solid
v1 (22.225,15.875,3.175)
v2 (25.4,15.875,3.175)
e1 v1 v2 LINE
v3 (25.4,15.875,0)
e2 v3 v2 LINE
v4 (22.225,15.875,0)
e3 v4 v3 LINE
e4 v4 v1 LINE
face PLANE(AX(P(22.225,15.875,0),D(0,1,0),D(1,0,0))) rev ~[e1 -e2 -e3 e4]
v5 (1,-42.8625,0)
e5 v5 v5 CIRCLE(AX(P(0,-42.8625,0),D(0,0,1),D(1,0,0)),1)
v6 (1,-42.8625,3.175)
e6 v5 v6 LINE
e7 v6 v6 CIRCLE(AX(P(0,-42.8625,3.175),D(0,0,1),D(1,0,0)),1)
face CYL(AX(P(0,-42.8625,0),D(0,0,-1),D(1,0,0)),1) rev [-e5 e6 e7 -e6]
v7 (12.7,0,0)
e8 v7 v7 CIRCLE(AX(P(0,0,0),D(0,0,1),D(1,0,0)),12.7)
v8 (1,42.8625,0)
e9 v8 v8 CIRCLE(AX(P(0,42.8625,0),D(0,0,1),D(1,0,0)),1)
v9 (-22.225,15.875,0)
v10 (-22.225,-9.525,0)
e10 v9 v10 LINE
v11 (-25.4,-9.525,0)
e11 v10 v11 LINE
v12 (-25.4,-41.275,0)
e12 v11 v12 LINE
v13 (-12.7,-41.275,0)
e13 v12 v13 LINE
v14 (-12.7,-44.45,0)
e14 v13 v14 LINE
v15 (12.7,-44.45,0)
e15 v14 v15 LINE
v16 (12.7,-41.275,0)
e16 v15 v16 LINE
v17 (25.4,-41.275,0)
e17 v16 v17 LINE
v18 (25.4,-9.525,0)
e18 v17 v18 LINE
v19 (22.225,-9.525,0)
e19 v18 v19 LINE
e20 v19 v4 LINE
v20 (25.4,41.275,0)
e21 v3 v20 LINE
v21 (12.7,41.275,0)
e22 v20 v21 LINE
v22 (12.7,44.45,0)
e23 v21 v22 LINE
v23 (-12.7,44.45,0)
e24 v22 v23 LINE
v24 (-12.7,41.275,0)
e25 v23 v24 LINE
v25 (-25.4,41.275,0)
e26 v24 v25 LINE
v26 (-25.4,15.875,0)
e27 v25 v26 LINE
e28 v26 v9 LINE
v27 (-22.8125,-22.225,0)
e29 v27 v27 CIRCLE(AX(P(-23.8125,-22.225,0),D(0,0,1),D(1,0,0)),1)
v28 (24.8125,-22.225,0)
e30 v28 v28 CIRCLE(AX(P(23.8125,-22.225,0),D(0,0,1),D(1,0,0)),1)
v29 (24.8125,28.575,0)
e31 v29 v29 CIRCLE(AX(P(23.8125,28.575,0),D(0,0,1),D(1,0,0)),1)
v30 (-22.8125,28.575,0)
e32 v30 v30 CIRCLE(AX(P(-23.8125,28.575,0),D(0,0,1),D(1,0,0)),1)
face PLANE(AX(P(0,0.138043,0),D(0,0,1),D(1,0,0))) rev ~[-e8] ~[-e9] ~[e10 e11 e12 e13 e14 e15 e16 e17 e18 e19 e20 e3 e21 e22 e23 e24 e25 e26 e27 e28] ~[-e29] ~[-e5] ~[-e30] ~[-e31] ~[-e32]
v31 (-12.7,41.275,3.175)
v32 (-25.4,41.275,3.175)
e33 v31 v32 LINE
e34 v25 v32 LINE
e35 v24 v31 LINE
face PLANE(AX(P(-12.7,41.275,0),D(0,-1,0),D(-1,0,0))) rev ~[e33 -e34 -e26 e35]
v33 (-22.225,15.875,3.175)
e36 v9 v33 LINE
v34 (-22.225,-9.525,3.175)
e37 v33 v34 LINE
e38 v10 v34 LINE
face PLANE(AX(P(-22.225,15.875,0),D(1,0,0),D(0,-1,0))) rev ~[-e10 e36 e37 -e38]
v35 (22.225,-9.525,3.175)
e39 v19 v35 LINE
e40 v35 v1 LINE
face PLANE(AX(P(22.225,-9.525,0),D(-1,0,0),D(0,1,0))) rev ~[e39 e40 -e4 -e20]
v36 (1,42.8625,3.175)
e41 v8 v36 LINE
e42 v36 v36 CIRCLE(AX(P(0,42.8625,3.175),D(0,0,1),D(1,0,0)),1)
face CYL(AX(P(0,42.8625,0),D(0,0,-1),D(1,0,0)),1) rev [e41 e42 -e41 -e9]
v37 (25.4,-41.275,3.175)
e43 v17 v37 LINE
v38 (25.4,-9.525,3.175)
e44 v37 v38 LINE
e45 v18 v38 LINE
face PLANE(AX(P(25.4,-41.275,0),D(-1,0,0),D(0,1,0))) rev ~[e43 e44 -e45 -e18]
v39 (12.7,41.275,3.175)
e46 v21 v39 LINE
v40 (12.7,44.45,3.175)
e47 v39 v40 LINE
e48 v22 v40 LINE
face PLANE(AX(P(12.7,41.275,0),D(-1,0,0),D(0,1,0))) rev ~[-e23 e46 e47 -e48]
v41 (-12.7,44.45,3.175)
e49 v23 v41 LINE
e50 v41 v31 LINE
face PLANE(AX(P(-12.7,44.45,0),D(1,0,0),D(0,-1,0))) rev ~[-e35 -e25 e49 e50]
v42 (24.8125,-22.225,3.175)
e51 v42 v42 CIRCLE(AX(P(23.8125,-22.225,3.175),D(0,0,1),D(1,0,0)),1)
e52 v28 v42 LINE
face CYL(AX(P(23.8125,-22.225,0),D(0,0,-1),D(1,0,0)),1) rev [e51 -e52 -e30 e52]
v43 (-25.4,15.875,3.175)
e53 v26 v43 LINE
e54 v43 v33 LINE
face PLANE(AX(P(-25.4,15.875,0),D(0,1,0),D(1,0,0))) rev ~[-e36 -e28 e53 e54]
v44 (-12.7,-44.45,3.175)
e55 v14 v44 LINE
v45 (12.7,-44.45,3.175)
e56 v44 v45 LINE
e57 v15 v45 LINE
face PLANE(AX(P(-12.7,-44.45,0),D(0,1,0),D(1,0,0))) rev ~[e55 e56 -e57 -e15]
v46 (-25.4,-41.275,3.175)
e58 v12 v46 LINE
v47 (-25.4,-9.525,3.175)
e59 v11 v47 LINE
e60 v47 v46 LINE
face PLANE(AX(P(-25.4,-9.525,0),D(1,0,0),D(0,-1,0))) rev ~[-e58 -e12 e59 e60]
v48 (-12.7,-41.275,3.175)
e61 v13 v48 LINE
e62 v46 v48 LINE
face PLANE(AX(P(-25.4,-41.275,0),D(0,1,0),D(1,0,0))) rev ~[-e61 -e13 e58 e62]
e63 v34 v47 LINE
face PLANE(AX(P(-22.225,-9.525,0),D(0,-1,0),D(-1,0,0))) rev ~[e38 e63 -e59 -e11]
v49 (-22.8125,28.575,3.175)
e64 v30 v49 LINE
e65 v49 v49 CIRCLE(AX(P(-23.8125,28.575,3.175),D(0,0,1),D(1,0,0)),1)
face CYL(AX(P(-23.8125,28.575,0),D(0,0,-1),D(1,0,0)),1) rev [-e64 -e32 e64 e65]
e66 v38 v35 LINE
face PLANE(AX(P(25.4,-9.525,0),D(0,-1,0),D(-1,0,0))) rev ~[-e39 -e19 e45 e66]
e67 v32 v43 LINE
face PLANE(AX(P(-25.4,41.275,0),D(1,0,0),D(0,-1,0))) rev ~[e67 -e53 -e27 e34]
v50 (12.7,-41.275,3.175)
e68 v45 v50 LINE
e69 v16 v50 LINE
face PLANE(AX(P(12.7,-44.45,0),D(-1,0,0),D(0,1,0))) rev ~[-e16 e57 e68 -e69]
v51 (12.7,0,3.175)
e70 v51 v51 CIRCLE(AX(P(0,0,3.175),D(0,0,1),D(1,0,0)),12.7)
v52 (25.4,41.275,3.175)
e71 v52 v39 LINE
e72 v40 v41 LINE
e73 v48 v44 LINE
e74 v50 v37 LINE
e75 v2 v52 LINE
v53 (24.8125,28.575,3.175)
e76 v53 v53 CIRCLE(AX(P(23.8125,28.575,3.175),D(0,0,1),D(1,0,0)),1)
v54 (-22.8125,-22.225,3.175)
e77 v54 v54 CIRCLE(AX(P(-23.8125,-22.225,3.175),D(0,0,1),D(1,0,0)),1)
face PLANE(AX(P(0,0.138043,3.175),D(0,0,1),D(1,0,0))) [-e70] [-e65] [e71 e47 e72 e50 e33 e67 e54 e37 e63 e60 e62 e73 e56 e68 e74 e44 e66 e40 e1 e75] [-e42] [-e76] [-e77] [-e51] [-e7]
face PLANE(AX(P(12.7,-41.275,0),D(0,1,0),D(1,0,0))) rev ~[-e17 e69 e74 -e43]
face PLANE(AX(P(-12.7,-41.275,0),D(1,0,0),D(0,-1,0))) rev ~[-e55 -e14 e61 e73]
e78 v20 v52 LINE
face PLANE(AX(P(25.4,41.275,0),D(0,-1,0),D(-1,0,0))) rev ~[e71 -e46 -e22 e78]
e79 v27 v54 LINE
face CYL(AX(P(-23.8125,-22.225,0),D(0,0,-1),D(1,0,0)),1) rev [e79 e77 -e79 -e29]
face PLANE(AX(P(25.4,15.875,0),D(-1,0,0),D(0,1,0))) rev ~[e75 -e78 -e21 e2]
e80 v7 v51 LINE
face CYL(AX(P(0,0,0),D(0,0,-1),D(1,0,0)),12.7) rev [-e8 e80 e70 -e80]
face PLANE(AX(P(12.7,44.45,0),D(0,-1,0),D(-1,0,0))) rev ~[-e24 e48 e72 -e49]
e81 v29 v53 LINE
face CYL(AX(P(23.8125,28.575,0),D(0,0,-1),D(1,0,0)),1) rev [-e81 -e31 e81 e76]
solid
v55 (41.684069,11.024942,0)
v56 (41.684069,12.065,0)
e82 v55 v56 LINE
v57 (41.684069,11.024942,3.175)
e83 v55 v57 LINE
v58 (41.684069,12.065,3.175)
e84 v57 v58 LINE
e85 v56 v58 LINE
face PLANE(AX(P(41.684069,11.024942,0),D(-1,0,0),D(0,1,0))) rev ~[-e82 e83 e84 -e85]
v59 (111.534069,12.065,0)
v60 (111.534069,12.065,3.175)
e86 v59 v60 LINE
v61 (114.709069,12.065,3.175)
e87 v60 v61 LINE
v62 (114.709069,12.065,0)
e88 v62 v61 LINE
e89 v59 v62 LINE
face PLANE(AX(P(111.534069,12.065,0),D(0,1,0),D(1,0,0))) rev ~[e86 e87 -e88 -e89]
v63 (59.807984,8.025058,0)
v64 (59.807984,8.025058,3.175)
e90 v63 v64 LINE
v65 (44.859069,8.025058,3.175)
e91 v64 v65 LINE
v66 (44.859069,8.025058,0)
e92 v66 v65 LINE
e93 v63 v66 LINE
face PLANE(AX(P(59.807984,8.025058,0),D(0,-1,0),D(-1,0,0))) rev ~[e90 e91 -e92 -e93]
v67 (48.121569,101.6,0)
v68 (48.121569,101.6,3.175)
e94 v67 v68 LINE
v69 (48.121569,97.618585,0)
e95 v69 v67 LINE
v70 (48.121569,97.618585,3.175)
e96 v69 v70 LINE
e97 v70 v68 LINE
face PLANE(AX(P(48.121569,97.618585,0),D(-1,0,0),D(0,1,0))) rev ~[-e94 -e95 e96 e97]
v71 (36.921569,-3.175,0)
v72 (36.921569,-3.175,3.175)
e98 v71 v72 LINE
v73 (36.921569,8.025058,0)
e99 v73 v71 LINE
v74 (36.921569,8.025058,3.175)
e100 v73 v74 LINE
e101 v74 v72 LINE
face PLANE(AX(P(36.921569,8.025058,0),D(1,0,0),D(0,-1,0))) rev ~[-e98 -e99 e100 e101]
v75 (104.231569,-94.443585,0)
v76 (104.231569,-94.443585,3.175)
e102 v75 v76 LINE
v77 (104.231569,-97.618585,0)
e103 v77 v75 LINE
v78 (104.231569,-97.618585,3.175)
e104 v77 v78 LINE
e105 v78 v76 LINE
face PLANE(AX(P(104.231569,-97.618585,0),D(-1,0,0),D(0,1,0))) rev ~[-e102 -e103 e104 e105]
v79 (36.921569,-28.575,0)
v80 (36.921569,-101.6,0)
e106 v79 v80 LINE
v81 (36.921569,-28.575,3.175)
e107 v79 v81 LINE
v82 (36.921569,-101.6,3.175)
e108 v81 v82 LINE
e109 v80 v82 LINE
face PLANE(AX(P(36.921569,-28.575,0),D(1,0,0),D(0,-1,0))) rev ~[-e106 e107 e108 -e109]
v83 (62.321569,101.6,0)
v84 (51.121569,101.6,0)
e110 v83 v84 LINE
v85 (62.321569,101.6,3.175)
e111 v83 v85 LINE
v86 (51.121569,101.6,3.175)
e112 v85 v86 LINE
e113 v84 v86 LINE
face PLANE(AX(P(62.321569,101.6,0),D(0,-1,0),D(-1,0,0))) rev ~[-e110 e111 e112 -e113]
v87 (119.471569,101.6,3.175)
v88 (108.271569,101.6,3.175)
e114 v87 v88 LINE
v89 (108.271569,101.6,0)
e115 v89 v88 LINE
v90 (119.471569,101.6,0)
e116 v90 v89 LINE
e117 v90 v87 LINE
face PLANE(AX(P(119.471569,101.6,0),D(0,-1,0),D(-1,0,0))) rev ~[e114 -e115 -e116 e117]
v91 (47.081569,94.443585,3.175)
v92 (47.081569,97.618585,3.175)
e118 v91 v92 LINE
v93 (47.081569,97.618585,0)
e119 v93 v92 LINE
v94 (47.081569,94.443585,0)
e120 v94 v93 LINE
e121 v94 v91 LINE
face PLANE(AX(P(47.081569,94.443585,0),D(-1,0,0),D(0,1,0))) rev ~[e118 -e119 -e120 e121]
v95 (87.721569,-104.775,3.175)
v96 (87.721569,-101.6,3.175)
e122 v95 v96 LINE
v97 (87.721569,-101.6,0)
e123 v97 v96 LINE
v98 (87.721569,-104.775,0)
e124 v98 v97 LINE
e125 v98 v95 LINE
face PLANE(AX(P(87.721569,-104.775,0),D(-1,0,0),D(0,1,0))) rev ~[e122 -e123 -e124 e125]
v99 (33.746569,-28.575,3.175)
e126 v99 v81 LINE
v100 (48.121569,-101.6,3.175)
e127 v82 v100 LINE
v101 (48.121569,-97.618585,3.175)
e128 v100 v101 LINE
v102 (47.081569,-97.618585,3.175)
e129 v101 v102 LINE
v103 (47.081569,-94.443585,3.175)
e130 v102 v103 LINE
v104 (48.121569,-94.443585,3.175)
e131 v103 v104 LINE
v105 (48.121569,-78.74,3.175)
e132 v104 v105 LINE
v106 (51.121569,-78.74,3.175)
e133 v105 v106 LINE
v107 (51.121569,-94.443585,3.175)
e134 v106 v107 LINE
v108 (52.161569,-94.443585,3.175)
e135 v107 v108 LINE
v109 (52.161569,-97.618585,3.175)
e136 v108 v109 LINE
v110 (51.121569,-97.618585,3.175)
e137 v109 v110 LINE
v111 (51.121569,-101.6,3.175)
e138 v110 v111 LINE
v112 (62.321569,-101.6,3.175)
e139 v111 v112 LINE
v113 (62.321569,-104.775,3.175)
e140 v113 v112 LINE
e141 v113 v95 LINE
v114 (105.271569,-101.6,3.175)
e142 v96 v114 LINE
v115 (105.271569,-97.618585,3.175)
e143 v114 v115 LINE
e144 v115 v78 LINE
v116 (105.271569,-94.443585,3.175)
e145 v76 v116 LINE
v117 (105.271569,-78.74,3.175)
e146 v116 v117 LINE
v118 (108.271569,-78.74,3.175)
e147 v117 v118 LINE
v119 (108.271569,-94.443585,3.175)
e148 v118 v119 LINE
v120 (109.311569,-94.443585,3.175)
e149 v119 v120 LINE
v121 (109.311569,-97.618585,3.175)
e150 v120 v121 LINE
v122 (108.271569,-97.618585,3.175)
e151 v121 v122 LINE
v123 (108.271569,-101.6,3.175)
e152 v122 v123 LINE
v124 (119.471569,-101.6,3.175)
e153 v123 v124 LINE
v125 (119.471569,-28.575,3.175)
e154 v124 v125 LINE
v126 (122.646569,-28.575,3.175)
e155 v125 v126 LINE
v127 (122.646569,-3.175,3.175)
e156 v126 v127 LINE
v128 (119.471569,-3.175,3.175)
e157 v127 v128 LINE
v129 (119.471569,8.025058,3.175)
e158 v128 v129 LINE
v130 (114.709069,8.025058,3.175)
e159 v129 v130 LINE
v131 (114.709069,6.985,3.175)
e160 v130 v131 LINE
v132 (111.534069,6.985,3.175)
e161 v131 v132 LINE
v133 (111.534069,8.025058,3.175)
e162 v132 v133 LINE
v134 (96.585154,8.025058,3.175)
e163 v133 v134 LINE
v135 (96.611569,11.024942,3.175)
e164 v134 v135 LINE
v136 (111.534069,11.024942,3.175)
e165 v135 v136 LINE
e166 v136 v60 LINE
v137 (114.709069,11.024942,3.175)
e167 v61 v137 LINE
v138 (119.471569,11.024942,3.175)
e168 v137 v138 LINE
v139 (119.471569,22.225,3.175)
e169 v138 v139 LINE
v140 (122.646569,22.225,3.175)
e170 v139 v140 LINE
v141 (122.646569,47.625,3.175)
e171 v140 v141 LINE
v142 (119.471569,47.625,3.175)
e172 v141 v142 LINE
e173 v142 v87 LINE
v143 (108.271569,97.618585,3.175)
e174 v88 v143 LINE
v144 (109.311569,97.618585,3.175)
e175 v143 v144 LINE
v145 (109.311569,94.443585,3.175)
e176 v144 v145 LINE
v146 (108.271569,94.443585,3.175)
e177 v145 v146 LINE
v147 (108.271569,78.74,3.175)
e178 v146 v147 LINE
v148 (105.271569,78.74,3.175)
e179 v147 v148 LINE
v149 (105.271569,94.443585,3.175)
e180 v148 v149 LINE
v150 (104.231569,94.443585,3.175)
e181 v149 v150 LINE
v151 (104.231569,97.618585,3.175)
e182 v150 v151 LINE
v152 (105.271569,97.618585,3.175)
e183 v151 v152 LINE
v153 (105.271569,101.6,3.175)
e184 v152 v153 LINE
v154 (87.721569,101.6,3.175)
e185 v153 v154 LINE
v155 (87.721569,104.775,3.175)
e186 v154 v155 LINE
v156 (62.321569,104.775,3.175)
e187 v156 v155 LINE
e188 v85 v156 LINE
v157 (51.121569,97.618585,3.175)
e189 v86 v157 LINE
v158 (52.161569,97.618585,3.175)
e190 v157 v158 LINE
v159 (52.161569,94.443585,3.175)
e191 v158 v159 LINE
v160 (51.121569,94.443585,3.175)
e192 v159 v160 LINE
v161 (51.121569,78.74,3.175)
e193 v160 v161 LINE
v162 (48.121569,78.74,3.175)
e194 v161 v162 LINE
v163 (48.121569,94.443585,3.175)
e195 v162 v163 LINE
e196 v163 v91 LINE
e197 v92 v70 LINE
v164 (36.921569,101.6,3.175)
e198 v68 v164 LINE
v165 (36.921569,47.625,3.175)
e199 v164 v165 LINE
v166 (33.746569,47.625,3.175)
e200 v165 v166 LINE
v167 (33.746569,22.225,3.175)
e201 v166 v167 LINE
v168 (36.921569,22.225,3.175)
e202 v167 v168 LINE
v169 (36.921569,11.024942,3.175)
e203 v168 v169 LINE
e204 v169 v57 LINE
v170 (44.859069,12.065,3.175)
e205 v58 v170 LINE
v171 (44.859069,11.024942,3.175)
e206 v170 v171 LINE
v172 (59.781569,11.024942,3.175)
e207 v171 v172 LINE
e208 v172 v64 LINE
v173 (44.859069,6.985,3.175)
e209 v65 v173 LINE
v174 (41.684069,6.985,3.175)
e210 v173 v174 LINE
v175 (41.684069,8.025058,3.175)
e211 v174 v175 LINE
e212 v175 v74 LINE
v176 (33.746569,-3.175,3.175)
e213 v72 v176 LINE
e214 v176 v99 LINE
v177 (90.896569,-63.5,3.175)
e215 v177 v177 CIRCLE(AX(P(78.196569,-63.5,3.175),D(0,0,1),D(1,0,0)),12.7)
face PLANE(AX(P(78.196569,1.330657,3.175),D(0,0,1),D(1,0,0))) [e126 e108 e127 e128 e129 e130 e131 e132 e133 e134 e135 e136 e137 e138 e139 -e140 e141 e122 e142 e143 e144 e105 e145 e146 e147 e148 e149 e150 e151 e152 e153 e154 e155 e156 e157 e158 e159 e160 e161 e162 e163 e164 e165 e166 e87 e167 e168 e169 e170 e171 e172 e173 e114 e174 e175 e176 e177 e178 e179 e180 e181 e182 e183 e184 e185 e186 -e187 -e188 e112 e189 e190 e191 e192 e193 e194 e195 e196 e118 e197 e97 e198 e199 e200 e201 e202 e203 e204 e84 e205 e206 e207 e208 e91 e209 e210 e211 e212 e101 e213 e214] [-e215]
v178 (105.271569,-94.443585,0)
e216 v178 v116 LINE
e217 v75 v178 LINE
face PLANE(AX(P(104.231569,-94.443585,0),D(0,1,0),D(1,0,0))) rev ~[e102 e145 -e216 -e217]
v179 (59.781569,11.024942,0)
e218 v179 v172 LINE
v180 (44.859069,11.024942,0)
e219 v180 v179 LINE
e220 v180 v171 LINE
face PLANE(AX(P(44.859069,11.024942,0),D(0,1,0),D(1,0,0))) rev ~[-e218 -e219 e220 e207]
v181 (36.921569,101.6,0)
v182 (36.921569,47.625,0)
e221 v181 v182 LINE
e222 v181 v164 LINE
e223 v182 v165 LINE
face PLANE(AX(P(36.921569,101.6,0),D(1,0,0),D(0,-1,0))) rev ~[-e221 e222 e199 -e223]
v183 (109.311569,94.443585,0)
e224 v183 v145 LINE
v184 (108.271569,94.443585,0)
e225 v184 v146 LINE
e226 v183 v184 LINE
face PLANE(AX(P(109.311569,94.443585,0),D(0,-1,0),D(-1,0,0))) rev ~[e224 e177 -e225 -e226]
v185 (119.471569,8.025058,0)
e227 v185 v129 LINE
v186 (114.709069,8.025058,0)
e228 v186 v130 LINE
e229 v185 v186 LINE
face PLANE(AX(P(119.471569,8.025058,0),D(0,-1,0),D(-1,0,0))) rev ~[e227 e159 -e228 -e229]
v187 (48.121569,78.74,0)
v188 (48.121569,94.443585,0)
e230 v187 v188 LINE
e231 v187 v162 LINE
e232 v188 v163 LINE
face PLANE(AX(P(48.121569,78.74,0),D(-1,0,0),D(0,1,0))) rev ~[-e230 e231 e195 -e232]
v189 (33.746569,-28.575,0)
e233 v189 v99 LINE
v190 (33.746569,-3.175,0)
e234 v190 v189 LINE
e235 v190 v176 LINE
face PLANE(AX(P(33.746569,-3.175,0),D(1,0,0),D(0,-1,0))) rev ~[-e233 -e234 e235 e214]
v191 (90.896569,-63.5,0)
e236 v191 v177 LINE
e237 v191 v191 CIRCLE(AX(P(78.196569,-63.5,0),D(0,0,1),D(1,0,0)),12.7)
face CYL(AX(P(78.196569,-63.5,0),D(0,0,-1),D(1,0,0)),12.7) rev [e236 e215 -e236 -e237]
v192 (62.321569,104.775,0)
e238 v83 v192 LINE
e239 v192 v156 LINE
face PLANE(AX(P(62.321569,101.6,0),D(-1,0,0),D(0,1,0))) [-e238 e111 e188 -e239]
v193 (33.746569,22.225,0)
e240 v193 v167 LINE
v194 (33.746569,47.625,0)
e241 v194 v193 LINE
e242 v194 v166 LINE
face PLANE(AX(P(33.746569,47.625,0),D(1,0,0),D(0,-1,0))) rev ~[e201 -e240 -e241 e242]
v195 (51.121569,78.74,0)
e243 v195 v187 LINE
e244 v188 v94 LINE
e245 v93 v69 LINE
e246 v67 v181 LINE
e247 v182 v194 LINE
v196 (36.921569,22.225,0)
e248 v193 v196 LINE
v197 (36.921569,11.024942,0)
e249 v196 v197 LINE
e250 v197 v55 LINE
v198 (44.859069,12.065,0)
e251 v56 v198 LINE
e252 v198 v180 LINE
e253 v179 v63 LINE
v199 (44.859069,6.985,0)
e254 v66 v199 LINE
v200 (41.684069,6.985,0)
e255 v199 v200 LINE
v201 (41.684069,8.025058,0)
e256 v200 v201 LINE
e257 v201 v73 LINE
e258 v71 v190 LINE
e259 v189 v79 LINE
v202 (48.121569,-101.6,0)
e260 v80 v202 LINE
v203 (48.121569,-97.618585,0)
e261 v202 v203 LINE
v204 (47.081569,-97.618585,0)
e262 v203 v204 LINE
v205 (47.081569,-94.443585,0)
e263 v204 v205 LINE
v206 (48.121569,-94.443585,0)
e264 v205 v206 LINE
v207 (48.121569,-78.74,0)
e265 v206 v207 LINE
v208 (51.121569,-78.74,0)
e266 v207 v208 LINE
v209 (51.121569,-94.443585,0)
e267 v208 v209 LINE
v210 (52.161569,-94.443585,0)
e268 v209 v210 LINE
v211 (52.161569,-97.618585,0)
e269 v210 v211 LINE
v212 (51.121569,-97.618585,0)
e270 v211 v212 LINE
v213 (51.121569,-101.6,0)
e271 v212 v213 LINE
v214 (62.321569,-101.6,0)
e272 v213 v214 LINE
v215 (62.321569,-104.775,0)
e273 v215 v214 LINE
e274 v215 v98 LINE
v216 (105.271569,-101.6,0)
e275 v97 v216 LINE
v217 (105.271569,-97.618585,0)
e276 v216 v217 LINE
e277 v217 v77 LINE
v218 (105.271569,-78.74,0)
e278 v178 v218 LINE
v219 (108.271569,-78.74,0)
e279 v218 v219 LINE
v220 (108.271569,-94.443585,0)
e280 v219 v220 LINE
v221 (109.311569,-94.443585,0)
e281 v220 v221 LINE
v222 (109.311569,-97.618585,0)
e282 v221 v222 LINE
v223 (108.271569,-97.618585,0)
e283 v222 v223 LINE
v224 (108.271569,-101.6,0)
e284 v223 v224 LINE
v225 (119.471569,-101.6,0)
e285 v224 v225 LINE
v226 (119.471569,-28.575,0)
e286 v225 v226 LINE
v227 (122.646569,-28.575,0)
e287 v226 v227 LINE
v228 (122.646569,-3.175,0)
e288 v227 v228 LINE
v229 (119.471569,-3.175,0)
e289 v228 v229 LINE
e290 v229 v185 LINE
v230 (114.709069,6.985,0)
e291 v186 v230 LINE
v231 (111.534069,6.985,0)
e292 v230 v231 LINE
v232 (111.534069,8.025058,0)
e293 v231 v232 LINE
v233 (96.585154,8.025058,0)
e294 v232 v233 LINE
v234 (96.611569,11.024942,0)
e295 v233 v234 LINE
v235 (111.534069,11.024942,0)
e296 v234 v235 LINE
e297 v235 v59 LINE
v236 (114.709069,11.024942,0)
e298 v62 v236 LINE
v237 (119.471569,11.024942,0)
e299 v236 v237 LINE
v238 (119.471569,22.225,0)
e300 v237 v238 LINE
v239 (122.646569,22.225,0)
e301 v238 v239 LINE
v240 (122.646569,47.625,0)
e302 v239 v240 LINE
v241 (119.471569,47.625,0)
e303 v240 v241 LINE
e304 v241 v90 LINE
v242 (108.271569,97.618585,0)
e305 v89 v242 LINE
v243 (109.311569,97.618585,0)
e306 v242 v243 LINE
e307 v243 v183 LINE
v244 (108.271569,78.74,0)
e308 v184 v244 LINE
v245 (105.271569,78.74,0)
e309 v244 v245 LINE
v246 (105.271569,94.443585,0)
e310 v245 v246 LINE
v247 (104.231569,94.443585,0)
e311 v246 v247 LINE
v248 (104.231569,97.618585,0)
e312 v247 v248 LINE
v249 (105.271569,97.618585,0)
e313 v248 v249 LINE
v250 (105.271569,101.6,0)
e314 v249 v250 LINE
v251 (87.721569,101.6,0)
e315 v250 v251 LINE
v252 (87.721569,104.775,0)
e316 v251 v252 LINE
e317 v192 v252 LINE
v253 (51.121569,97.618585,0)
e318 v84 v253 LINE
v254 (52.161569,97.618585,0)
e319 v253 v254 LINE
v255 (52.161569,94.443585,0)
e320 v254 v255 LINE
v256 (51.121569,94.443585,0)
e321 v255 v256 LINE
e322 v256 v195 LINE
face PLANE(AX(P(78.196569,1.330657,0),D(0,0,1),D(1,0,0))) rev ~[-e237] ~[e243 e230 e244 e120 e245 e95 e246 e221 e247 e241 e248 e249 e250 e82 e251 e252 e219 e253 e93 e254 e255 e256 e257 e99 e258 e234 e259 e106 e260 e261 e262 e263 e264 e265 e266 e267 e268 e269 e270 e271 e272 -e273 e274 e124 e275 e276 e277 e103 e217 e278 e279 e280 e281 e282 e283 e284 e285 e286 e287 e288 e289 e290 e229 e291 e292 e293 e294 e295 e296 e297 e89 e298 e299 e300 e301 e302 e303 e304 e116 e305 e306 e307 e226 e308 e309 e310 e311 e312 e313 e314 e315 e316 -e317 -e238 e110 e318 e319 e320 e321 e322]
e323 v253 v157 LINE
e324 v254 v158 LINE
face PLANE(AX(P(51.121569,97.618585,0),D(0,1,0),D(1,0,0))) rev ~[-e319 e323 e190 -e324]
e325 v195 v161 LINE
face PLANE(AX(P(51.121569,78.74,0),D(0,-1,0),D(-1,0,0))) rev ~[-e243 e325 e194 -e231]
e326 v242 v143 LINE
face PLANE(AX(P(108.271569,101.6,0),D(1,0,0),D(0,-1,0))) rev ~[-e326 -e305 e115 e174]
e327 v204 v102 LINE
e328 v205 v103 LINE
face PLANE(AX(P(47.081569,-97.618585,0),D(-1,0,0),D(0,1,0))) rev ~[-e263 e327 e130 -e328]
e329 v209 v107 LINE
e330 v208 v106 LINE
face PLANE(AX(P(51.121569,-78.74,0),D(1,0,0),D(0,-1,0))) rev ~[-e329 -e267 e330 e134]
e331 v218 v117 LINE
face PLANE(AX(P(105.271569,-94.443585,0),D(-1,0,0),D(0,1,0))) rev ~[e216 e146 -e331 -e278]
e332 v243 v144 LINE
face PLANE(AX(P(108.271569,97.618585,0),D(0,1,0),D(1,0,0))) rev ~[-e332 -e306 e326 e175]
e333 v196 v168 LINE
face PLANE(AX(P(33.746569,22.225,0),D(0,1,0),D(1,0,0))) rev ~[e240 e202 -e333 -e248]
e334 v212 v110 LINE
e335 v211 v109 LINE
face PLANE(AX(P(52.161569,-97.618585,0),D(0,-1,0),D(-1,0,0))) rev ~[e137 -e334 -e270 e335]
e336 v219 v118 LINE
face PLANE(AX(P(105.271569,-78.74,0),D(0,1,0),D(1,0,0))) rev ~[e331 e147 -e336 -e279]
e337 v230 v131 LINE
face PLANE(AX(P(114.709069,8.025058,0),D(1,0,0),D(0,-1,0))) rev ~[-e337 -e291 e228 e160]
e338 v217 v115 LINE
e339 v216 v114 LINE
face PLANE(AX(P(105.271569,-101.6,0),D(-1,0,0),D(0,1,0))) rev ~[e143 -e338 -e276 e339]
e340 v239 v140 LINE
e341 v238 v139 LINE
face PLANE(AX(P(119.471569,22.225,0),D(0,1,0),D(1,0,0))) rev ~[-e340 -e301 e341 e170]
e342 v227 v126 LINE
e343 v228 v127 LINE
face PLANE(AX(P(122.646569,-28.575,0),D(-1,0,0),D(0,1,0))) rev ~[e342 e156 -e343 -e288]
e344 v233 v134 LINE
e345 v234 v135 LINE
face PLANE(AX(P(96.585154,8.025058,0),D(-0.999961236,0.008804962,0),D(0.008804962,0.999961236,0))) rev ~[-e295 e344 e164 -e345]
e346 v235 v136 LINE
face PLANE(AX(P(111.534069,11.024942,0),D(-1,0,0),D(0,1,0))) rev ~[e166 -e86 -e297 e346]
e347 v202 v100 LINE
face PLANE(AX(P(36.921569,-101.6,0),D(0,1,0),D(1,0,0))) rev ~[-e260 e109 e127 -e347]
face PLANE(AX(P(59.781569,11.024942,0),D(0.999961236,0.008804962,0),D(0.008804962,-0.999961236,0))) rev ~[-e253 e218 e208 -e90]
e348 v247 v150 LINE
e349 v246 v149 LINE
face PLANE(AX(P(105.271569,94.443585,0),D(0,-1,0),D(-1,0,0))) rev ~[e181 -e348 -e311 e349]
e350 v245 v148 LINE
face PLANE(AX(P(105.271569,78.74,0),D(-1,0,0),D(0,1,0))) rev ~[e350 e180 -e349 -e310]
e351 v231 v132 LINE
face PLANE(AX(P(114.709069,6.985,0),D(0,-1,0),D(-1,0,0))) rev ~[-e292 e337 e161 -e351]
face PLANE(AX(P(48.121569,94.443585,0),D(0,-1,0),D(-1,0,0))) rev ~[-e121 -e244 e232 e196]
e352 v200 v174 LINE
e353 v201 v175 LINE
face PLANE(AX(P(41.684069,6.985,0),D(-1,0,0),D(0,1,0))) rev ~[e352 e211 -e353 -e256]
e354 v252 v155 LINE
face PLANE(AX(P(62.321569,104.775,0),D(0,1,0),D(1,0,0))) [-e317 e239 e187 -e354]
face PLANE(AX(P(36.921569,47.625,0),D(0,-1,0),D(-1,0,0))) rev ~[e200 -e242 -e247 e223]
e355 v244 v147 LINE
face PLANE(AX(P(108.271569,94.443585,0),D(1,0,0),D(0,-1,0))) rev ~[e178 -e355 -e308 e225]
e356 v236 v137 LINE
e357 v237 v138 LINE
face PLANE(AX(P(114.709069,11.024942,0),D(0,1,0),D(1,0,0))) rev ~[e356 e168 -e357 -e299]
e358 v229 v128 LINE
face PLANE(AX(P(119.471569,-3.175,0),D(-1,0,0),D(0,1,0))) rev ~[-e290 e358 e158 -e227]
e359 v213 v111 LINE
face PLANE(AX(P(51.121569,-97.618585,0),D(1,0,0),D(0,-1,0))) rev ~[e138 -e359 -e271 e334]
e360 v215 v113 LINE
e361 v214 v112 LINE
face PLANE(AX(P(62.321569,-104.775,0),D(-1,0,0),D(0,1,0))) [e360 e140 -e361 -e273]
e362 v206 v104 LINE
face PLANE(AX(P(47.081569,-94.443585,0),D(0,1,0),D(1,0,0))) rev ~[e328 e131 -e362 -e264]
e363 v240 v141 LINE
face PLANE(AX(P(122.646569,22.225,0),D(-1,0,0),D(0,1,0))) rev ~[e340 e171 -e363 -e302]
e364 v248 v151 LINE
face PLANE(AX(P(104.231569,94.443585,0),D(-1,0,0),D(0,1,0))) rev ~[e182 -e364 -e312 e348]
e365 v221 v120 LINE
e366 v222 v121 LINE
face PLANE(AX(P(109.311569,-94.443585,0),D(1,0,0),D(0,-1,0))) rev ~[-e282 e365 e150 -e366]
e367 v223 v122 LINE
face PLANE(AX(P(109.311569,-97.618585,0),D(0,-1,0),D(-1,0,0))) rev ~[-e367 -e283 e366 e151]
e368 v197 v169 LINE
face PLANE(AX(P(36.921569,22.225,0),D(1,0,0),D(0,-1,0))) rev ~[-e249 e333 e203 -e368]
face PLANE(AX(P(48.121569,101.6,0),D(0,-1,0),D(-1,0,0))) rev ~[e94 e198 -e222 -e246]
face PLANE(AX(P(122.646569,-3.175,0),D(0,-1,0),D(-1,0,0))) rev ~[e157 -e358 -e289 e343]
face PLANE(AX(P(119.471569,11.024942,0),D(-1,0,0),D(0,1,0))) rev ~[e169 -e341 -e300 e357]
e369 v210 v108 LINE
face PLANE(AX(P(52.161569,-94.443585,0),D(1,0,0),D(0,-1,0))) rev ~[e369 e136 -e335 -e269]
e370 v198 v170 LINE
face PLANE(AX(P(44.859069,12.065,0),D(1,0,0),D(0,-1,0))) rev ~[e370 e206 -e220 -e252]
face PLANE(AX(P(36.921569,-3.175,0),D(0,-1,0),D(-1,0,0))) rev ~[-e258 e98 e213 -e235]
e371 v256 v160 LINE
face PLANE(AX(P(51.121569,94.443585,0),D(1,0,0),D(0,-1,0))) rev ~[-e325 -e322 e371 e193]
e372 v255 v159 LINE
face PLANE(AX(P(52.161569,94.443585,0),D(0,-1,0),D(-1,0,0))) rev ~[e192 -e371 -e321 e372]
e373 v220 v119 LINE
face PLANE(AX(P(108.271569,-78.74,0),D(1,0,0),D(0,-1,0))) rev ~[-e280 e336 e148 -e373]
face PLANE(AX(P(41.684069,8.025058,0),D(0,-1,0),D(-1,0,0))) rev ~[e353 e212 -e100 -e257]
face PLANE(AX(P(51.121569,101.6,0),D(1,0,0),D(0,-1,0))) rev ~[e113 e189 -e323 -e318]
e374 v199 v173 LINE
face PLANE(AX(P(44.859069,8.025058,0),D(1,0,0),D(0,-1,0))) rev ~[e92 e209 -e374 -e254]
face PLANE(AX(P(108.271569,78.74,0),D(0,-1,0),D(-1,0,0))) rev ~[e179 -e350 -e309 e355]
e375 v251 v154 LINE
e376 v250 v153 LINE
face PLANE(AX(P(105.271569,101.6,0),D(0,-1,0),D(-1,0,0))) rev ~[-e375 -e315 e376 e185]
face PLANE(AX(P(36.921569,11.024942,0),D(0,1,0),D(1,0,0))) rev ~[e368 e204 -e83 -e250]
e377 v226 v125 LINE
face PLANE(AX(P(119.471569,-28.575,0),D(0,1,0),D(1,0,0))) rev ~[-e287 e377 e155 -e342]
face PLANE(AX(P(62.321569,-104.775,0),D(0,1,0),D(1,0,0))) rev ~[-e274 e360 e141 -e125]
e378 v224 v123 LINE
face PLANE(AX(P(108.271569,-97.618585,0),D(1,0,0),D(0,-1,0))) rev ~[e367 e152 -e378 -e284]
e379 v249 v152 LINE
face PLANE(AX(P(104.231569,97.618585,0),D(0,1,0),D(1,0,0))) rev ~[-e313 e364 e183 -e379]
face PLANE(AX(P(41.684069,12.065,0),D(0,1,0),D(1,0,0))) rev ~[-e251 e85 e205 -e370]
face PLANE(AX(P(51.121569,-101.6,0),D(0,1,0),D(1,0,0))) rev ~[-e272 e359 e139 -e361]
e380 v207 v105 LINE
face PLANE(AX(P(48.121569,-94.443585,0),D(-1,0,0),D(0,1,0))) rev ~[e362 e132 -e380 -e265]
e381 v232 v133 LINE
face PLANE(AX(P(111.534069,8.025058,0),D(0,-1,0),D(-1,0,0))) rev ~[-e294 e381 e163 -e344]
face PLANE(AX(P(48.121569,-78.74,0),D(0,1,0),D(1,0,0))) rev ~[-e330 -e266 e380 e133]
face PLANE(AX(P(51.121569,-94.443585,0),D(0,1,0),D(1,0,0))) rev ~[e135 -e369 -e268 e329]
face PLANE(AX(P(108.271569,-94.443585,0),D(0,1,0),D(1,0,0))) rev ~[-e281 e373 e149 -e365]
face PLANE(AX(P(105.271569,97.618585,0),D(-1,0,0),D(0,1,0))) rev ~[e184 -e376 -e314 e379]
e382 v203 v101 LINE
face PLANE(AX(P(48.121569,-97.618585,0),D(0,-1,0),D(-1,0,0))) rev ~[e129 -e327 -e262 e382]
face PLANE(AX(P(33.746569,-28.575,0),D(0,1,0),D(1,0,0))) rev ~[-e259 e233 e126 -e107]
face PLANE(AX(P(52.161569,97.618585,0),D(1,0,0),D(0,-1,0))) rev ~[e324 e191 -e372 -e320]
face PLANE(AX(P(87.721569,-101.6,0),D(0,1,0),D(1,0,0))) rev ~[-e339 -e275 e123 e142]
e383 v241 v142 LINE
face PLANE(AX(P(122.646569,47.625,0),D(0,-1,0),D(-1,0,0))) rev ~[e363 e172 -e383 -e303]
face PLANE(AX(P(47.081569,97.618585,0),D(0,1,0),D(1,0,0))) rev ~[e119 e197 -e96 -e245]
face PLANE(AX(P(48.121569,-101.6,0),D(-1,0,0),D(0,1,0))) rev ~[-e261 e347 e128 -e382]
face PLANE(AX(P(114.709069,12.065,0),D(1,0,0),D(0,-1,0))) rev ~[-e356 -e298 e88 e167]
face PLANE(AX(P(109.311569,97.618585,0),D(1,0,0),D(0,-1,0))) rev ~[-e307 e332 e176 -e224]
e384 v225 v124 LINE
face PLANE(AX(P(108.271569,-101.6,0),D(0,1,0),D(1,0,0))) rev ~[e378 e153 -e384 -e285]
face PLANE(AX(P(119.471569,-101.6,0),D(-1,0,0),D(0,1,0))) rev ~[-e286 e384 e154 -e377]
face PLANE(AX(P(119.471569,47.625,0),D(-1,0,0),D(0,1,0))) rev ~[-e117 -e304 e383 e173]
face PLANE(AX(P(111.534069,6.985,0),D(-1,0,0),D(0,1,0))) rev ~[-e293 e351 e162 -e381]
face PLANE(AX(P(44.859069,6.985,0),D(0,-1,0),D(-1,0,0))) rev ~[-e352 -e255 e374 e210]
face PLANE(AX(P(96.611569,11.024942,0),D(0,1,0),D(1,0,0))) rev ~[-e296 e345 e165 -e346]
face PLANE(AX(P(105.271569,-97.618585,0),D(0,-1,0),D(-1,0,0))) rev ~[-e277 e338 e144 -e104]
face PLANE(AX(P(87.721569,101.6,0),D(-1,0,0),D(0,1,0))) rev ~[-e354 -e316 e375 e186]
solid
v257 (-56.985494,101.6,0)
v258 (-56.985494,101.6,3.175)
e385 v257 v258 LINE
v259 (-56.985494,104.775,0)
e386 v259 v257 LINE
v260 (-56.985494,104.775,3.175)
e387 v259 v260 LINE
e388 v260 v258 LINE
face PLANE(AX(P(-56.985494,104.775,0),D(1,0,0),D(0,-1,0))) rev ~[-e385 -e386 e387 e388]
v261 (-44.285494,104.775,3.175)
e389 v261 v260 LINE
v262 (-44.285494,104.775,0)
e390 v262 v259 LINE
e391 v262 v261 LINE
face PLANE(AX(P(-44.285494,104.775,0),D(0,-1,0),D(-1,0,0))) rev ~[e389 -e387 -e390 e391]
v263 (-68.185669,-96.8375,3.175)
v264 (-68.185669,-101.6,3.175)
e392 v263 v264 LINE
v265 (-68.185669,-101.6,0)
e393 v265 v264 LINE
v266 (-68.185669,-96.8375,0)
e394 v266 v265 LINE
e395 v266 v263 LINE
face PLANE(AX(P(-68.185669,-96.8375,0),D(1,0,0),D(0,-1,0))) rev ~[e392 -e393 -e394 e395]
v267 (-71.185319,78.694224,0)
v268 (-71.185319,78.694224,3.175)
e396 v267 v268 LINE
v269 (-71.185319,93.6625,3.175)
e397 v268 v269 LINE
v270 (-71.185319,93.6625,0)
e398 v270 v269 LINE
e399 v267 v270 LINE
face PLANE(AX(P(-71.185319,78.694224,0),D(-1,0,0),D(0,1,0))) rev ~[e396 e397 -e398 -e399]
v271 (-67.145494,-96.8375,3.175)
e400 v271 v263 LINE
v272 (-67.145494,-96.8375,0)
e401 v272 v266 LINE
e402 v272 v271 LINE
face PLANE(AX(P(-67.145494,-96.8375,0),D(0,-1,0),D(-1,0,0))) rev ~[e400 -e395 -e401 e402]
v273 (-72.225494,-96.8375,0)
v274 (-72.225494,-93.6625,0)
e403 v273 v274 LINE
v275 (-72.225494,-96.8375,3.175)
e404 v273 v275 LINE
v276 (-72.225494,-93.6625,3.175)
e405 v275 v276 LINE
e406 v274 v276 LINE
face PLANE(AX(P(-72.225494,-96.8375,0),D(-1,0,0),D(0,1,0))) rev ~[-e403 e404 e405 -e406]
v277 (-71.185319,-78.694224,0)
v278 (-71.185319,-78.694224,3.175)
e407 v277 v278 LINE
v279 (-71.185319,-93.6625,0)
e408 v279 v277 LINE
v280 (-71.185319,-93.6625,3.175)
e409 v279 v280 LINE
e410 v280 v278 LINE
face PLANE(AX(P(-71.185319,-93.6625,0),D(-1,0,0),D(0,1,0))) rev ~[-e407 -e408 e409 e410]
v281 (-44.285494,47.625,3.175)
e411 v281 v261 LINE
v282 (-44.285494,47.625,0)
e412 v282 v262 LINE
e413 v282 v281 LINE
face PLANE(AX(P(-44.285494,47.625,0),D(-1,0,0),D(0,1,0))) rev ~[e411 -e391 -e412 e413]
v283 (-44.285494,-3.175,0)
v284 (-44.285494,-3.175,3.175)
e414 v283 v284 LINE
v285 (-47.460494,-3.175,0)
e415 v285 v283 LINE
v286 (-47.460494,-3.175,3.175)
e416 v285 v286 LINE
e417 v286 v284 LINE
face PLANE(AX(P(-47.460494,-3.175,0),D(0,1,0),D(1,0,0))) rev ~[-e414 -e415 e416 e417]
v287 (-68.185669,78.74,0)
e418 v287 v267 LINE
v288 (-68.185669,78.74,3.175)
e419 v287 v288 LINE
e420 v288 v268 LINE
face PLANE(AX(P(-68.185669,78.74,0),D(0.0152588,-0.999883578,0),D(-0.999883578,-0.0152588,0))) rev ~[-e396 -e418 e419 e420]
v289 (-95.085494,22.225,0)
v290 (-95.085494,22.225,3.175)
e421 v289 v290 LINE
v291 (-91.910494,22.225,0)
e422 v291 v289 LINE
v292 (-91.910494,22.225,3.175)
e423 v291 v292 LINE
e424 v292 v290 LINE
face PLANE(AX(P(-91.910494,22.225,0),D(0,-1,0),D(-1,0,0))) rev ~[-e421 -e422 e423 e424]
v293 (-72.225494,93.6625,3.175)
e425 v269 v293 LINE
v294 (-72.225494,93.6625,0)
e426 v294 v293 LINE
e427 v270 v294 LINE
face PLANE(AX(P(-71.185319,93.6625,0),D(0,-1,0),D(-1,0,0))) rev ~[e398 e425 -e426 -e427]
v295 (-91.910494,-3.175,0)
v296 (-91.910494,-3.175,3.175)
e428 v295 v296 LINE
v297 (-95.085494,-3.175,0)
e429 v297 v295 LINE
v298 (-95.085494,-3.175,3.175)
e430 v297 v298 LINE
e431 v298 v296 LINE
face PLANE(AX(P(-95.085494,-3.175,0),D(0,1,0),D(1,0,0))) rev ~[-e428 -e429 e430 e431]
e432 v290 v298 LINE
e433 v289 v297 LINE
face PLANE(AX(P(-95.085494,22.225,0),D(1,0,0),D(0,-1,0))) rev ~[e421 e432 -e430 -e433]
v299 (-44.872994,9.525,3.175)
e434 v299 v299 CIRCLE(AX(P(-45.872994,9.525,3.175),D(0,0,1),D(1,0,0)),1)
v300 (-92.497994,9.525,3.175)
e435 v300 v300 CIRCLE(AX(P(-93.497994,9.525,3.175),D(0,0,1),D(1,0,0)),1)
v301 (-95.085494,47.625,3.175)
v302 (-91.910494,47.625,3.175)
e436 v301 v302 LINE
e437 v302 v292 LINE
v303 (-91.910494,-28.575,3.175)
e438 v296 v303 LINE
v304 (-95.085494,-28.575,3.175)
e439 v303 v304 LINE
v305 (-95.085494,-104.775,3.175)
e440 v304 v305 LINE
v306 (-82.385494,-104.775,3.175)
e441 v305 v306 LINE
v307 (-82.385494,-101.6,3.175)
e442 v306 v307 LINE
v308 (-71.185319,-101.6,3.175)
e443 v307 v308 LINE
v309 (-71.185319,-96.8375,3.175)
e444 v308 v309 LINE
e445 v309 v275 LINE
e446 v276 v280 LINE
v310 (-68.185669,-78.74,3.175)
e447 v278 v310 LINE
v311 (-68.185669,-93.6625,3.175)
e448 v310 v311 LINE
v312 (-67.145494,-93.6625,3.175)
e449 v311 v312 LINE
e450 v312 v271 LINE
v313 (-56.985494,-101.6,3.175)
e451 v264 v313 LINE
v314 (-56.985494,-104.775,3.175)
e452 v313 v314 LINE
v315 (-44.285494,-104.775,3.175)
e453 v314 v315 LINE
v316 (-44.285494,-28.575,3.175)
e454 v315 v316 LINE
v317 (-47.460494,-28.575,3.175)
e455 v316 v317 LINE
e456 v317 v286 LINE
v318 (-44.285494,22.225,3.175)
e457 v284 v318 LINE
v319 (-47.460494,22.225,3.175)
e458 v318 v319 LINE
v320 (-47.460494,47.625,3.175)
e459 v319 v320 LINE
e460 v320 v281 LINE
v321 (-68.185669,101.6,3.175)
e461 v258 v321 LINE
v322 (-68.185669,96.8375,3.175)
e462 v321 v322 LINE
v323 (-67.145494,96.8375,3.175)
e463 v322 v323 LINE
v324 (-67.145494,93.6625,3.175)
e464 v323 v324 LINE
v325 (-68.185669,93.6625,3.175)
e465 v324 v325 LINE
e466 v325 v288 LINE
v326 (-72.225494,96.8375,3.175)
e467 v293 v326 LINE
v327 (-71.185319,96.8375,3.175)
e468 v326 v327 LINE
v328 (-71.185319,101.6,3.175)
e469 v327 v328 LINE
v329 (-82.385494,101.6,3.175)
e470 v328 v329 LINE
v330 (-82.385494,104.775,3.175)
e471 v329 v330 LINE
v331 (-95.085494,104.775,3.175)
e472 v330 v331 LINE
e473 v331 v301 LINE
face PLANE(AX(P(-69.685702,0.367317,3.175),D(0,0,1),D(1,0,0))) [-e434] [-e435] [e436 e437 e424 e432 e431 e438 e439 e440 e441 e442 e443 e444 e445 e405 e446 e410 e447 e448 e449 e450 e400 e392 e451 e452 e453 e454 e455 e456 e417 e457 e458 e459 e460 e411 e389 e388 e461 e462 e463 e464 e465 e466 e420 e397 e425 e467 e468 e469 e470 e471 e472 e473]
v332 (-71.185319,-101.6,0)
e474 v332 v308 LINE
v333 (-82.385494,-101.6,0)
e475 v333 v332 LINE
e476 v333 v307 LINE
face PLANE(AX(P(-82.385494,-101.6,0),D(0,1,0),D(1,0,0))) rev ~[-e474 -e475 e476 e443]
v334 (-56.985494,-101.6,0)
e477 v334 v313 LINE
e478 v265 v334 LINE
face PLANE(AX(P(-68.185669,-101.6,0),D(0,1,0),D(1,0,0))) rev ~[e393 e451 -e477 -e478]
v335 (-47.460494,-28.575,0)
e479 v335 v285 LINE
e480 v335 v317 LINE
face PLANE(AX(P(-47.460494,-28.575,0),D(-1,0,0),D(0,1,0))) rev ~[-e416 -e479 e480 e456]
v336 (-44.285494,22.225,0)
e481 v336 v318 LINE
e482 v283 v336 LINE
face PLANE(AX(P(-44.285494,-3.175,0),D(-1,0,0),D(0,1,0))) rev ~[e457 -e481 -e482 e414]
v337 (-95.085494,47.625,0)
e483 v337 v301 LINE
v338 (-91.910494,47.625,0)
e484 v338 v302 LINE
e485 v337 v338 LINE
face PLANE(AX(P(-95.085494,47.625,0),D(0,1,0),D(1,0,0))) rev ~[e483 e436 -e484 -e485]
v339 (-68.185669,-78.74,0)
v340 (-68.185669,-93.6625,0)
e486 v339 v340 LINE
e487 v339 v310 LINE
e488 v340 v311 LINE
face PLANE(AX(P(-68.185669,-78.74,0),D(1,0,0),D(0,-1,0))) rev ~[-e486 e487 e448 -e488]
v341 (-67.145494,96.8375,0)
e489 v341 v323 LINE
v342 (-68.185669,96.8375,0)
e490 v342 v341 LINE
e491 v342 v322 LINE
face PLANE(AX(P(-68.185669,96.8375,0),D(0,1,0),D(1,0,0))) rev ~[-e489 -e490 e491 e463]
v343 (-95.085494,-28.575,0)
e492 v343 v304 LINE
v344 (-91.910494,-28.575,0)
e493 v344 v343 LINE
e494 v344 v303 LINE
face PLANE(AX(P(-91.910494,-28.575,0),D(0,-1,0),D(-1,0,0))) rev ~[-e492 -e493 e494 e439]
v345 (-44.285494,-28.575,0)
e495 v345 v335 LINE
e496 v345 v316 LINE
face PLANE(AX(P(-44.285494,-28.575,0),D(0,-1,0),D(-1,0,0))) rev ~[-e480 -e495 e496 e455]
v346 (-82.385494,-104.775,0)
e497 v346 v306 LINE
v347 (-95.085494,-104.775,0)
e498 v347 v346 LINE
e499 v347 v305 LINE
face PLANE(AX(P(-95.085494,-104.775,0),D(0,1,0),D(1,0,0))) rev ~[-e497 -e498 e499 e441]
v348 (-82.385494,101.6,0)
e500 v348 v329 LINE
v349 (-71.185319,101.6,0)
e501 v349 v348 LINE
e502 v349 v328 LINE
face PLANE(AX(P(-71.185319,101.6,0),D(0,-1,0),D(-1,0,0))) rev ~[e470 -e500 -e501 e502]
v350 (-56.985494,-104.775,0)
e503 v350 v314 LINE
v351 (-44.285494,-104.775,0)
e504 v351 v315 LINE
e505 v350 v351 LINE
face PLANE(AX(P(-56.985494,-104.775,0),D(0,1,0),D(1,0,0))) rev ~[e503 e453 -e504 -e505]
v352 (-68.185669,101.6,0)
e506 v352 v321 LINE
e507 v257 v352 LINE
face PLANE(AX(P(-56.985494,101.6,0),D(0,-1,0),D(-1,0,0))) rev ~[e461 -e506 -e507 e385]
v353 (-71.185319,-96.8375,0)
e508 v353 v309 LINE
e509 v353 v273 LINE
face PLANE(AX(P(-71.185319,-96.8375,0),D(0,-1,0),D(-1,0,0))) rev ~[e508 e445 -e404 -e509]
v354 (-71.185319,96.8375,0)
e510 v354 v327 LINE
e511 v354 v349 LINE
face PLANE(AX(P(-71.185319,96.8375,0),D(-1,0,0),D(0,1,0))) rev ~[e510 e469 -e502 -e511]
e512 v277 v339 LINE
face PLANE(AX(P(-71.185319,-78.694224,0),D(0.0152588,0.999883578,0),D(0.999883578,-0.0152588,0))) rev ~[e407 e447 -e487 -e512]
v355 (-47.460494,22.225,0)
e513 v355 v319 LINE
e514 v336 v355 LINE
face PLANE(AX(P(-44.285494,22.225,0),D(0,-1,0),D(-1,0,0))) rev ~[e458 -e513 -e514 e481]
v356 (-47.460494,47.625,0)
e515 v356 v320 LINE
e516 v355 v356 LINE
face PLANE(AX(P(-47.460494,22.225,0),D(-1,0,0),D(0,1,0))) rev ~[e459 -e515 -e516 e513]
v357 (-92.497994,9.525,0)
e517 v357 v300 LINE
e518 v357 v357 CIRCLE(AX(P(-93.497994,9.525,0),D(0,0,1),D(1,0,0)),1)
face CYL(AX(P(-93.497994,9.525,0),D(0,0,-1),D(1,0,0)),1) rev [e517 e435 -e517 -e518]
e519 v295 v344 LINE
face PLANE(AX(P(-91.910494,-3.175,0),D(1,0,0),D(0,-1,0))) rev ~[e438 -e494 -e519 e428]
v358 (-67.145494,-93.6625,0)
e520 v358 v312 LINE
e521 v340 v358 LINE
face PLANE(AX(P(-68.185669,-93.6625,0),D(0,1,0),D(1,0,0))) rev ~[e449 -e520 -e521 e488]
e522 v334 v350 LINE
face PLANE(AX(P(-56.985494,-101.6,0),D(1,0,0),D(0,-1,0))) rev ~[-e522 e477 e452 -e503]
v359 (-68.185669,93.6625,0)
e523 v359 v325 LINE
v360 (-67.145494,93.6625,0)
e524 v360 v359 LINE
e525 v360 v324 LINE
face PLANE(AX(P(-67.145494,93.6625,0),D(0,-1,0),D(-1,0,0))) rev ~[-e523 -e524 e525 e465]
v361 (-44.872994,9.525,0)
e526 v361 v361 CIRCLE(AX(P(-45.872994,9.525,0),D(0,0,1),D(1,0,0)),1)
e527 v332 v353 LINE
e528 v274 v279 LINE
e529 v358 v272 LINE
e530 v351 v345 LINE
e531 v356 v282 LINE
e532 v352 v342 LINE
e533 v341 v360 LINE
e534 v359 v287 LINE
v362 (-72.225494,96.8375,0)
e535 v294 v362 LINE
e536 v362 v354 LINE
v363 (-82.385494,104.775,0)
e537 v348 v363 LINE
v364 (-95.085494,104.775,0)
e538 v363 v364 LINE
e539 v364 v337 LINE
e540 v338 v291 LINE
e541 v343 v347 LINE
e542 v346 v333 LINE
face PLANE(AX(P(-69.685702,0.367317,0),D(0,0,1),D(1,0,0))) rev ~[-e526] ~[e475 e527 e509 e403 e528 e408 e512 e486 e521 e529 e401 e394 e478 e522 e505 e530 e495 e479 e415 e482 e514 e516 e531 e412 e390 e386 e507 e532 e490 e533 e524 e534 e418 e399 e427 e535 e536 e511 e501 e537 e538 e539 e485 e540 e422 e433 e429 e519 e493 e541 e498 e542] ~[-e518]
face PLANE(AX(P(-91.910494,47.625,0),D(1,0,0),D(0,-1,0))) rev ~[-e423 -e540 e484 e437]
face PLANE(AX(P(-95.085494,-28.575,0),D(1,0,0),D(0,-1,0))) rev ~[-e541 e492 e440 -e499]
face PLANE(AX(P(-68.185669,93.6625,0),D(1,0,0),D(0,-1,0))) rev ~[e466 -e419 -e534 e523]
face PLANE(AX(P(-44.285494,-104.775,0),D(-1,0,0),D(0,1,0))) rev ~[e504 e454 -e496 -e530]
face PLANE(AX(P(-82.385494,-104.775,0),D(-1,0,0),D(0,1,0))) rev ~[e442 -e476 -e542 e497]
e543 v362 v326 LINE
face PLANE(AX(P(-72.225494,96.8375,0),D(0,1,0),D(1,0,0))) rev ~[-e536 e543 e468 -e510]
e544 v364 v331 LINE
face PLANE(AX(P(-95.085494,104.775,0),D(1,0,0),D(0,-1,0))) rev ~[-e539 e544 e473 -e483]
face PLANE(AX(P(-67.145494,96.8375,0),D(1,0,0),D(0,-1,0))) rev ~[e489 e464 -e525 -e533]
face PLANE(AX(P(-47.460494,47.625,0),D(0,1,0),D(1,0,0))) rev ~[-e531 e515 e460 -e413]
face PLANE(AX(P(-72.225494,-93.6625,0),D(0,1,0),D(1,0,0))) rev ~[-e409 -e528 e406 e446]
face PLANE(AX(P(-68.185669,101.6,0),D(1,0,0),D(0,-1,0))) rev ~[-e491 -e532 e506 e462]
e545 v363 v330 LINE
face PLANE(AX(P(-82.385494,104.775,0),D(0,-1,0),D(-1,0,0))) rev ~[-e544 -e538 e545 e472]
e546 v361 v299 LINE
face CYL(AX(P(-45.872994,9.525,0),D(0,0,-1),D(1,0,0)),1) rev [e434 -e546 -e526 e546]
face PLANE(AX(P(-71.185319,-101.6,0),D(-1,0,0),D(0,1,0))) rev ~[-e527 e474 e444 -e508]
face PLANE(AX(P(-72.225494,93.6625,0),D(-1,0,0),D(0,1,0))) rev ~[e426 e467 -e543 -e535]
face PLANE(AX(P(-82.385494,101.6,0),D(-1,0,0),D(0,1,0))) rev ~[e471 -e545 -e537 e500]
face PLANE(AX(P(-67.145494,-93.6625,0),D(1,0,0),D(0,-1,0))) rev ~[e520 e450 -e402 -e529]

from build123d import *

# Parameters (mm, degrees)
F0_R     = 1
F0_R_2   = 12.7
F2_DEPTH = 3.175
F1_R     = 1
F3_DEPTH = 3.175
F4_R     = 12.7
F4_W     = 25.4
F4_H     = 3.175
F5_DEPTH = 3.175


# Not quite as in the source:
# - a length typed as a fraction of an inch, garbled in the dataset ("3 / 203.2 mm" for 3/8 in), is restored


with BuildPart() as f2:
    # F0 (on Top) → F2 (new body)
    with BuildSketch(Plane.XY):
        Polygon((-12.7, 41.275), (-22.225, 41.275), (-25.4, 41.275), (-25.4, 15.875), (-22.225, 15.875), (-22.225, -9.525), (-25.4, -9.525), (-25.4, -34.925), (-25.4, -41.275), (-22.225, -41.275), (-12.7, -41.275), (-12.7, -44.45), (12.7, -44.45), (12.7, -41.275), (22.225, -41.275), (25.4, -41.275), (25.4, -34.925), (25.4, -9.525), (22.225, -9.525), (22.225, 15.875), (25.4, 15.875), (25.4, 41.275), (22.225, 41.275), (12.7, 41.275), (12.7, 44.45), (-12.7, 44.45), align=None)
        with Locations((0, -42.8625)):
            Circle(F0_R, mode=Mode.SUBTRACT)
        with Locations((-23.8125, -22.225)):
            Circle(F0_R, mode=Mode.SUBTRACT)
        with Locations((23.8125, -22.225)):
            Circle(F0_R, mode=Mode.SUBTRACT)
        Circle(F0_R_2, mode=Mode.SUBTRACT)
        with Locations((-23.8125, 28.575)):
            Circle(F0_R, mode=Mode.SUBTRACT)
        with Locations((0, 42.8625)):
            Circle(F0_R, mode=Mode.SUBTRACT)
        with Locations((23.8125, 28.575)):
            Circle(F0_R, mode=Mode.SUBTRACT)
    extrude(amount=F2_DEPTH)


with BuildPart() as f3:
    # F1 (on Top) → F3 (new body)
    with BuildSketch(Plane.XY):
        Polygon((-71.1853192556, 101.6), (-82.385493889, 101.6), (-82.385493889, 104.775), (-95.085493889, 104.775), (-95.085493889, 101.6), (-95.085493889, 47.625), (-91.910493889, 47.625), (-91.910493889, 22.225), (-95.085493889, 22.225), (-95.085493889, -3.175), (-91.910493889, -3.175), (-91.910493889, -28.575), (-95.085493889, -28.575), (-95.085493889, -101.6), (-95.085493889, -104.775), (-82.385493889, -104.775), (-82.385493889, -101.6), (-71.1853192556, -101.6), (-71.1853192556, -96.8375), (-72.225493889, -96.8375), (-72.225493889, -93.6625), (-71.1853192556, -93.6625), (-71.1853192556, -78.6942235994), (-68.1856685224, -78.74), (-68.1856685224, -93.6625), (-67.145493889, -93.6625), (-67.145493889, -96.8375), (-68.1856685224, -96.8375), (-68.1856685224, -101.6), (-56.985493889, -101.6), (-56.985493889, -104.775), (-44.285493889, -104.775), (-44.285493889, -101.6), (-44.285493889, -28.575), (-47.460493889, -28.575), (-47.460493889, -3.175), (-44.285493889, -3.175), (-44.285493889, 22.225), (-47.460493889, 22.225), (-47.460493889, 47.625), (-44.285493889, 47.625), (-44.285493889, 101.6), (-44.285493889, 104.775), (-56.985493889, 104.775), (-56.985493889, 101.6), (-68.1856685224, 101.6), (-68.1856685224, 96.8375), (-67.145493889, 96.8375), (-67.145493889, 93.6625), (-68.1856685224, 93.6625), (-68.1856685224, 78.74), (-71.1853192556, 78.6942235994), (-71.1853192556, 93.6625), (-72.225493889, 93.6625), (-72.225493889, 96.8375), (-71.1853192556, 96.8375), align=None)
        with Locations((-93.497993889, 9.525)):
            Circle(F1_R, mode=Mode.SUBTRACT)
        with Locations((-45.872993889, 9.525)):
            Circle(F1_R, mode=Mode.SUBTRACT)
    extrude(amount=F3_DEPTH)


with BuildPart() as f5:
    # F4 (on Top) → F5 (new body)
    with BuildSketch(Plane.XY):
        Polygon((48.1215686488, 101.6), (36.9215686488, 101.6), (36.9215686488, 47.625), (33.7465686488, 47.625), (33.7465686488, 22.225), (36.9215686488, 22.225), (36.9215686488, 11.0249418534), (41.6840686488, 11.0249418534), (41.6840686488, 12.065), (44.8590686488, 12.065), (44.8590686488, 11.0249418534), (59.7815686488, 11.0249418534), (59.8079835334, 8.0250581466), (44.8590686488, 8.0250581466), (44.8590686488, 6.985), (41.6840686488, 6.985), (41.6840686488, 8.0250581466), (36.9215686488, 8.0250581466), (36.9215686488, -3.175), (33.7465686488, -3.175), (33.7465686488, -28.575), (36.9215686488, -28.575), (36.9215686488, -101.6), (48.1215686488, -101.6), (48.1215686488, -97.6185846567), (47.0815686488, -97.6185846567), (47.0815686488, -94.4435846567), (48.1215686488, -94.4435846567), (48.1215686488, -78.74), (51.1215686488, -78.74), (51.1215686488, -94.4435846567), (52.1615686488, -94.4435846567), (52.1615686488, -97.6185846567), (51.1215686488, -97.6185846567), (51.1215686488, -101.6), (62.3215686488, -101.6), (87.7215686488, -101.6), (105.2715686488, -101.6), (105.2715686488, -97.6185846567), (104.2315686488, -97.6185846567), (104.2315686488, -94.4435846567), (105.2715686488, -94.4435846567), (105.2715686488, -78.74), (108.2715686488, -78.74), (108.2715686488, -94.4435846567), (109.3115686488, -94.4435846567), (109.3115686488, -97.6185846567), (108.2715686488, -97.6185846567), (108.2715686488, -101.6), (119.4715686488, -101.6), (119.4715686488, -28.575), (122.6465686488, -28.575), (122.6465686488, -3.175), (119.4715686488, -3.175), (119.4715686488, 8.0250581466), (114.7090686488, 8.0250581466), (114.7090686488, 6.985), (111.5340686488, 6.985), (111.5340686488, 8.0250581466), (96.585153764, 8.0250581466), (96.6115686488, 11.0249418534), (111.5340686488, 11.0249418534), (111.5340686488, 12.065), (114.7090686488, 12.065), (114.7090686488, 11.0249418534), (119.4715686488, 11.0249418534), (119.4715686488, 22.225), (122.6465686488, 22.225), (122.6465686488, 47.625), (119.4715686488, 47.625), (119.4715686488, 101.6), (108.2715686488, 101.6), (108.2715686488, 97.6185846567), (109.3115686488, 97.6185846567), (109.3115686488, 94.4435846567), (108.2715686488, 94.4435846567), (108.2715686488, 78.74), (105.2715686488, 78.74), (105.2715686488, 94.4435846567), (104.2315686488, 94.4435846567), (104.2315686488, 97.6185846567), (105.2715686488, 97.6185846567), (105.2715686488, 101.6), (87.7215686488, 101.6), (62.3215686488, 101.6), (51.1215686488, 101.6), (51.1215686488, 97.6185846567), (52.1615686488, 97.6185846567), (52.1615686488, 94.4435846567), (51.1215686488, 94.4435846567), (51.1215686488, 78.74), (48.1215686488, 78.74), (48.1215686488, 94.4435846567), (47.0815686488, 94.4435846567), (47.0815686488, 97.6185846567), (48.1215686488, 97.6185846567), align=None)
        with Locations((78.1965686488, -63.5)):
            Circle(F4_R, mode=Mode.SUBTRACT)
        with Locations((75.0215686488, -103.1875)):
            Rectangle(F4_W, F4_H)
        with Locations((75.0215686488, 103.1875)):
            Rectangle(F4_W, F4_H)
    extrude(amount=F5_DEPTH)


solid = Compound([f2.part, f3.part, f5.part])
